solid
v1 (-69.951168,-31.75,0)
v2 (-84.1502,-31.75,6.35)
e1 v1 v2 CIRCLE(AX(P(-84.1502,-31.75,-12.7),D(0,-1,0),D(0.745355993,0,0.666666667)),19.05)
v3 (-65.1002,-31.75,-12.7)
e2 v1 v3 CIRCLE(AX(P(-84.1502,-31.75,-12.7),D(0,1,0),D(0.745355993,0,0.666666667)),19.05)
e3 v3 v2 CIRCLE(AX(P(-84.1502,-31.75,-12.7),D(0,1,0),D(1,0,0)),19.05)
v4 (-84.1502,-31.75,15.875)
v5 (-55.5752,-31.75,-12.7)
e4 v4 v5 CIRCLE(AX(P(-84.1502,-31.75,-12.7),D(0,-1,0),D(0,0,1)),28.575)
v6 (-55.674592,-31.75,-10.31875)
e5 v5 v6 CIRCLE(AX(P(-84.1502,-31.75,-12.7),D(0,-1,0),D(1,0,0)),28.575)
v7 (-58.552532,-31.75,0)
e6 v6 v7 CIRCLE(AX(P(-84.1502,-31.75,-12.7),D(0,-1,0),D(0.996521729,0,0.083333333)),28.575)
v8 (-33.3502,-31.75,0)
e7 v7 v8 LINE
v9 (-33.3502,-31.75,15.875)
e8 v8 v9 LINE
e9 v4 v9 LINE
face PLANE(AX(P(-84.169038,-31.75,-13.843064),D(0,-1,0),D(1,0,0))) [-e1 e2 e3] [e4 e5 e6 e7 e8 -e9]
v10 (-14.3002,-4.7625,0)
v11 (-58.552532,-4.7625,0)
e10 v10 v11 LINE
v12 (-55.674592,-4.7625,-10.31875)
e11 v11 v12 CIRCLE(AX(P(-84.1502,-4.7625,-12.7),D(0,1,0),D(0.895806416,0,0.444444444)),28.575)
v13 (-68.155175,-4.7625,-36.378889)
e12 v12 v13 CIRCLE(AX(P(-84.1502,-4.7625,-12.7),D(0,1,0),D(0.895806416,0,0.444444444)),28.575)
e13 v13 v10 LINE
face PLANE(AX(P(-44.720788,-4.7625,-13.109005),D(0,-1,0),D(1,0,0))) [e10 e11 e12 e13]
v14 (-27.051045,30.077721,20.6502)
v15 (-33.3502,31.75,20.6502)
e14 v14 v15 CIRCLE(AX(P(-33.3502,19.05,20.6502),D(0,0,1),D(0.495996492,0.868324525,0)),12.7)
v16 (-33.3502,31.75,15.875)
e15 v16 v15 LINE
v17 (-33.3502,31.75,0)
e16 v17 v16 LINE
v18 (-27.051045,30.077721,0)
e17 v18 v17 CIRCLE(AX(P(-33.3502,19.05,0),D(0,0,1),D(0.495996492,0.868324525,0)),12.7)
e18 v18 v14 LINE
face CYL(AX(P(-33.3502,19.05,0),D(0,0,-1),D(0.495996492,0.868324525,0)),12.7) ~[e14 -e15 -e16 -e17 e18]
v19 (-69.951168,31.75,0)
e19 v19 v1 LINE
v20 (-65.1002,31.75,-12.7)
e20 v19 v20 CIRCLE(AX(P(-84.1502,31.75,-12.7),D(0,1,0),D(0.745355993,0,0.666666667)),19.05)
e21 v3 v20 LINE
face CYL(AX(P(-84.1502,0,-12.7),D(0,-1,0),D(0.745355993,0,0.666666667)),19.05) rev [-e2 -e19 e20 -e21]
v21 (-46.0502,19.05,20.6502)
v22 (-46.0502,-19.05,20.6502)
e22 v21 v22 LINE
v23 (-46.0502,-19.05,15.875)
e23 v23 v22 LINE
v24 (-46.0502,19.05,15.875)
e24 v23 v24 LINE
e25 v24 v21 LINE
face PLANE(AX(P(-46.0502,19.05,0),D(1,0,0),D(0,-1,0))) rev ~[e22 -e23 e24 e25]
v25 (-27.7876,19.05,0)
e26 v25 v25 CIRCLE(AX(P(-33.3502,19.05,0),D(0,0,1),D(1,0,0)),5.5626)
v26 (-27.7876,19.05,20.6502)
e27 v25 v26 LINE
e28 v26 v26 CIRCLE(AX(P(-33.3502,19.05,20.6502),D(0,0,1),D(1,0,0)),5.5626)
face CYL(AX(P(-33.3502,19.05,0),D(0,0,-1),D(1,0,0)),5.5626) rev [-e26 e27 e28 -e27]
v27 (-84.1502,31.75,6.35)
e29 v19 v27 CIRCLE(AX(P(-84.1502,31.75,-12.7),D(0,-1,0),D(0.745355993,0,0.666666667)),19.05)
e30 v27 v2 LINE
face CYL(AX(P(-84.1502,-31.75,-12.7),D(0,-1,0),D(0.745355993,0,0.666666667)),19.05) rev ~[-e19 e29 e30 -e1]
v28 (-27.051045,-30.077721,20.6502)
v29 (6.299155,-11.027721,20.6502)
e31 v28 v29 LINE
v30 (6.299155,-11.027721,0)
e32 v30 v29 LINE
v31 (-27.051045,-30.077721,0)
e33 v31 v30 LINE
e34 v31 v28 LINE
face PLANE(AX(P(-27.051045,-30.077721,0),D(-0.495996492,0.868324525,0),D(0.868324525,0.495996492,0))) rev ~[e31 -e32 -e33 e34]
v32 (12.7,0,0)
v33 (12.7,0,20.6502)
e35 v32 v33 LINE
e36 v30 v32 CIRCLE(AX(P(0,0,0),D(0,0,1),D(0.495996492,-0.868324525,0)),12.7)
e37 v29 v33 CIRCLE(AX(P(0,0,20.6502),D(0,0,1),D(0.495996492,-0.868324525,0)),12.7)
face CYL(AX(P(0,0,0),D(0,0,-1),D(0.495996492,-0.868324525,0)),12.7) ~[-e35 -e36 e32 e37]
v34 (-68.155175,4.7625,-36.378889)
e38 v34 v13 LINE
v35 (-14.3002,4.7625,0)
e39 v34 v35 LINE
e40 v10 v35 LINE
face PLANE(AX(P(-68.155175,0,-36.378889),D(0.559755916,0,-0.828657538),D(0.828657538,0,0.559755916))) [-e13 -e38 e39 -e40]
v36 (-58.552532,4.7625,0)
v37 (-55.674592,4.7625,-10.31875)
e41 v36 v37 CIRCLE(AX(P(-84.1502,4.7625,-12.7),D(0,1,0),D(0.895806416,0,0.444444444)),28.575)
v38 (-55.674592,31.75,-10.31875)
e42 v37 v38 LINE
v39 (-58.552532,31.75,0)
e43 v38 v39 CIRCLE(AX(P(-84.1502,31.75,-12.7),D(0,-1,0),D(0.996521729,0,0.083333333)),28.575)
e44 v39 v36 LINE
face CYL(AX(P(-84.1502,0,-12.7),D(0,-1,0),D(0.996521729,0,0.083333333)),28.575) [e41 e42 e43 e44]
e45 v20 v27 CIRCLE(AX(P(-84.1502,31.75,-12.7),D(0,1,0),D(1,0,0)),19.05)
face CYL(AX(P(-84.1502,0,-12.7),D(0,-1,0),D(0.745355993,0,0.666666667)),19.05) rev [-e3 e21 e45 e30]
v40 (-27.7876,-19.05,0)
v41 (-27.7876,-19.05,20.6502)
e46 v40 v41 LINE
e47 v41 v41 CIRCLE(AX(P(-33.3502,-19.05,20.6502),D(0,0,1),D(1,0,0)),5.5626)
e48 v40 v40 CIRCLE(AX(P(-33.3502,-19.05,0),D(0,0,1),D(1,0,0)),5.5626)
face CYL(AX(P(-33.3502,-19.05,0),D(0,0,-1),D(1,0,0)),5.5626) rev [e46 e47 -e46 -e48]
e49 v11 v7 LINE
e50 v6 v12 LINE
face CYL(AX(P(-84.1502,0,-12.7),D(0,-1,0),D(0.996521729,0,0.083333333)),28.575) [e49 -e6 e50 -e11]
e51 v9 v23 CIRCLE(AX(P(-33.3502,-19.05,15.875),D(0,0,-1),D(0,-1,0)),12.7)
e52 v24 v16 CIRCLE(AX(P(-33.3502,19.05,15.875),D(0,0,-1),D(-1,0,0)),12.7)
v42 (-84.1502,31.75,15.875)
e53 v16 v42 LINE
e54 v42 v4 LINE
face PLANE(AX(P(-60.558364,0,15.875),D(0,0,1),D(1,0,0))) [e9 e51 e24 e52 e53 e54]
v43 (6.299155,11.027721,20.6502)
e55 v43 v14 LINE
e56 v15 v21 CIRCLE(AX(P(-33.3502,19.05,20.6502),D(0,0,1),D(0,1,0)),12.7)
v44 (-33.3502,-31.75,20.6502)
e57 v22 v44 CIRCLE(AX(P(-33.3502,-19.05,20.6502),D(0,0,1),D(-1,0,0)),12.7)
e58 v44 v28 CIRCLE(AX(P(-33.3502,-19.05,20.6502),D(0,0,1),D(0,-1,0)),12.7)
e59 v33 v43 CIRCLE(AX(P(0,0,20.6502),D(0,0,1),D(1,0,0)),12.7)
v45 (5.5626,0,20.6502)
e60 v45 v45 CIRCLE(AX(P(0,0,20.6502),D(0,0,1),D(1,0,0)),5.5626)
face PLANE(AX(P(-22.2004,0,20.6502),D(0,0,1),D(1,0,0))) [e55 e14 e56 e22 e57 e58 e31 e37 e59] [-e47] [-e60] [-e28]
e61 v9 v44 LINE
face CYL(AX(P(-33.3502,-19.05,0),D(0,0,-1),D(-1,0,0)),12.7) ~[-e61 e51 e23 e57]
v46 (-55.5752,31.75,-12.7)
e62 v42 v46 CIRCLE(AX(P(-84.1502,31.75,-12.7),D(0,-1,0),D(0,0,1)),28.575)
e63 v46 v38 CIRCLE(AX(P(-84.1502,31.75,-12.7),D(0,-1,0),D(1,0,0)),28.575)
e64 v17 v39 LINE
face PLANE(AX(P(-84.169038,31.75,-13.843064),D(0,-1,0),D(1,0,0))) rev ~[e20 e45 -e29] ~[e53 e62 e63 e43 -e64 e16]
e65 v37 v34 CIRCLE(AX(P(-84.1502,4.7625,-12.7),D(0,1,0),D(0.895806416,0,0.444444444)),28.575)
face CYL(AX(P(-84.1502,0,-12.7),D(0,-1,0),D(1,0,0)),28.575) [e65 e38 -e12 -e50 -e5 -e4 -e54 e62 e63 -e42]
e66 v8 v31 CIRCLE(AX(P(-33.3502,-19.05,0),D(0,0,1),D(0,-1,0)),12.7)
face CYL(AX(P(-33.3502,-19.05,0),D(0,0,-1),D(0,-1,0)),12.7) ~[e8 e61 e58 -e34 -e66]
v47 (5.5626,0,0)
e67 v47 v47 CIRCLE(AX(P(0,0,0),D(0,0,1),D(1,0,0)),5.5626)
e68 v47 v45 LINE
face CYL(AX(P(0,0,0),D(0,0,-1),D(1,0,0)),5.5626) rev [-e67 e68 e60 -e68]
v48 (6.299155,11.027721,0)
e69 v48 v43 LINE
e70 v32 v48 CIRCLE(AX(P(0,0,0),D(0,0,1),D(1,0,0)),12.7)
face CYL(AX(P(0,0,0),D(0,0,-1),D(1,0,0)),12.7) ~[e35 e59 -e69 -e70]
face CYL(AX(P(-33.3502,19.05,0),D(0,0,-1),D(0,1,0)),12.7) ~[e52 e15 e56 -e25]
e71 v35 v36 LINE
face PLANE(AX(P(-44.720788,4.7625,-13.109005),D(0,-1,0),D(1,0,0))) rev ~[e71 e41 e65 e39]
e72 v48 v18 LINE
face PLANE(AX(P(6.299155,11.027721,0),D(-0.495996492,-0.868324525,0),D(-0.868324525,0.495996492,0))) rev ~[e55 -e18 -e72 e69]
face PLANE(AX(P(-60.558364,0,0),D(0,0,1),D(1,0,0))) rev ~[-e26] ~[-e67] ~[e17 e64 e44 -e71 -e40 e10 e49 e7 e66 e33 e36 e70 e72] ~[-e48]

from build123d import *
from build123d import SkipClean  # not in build123d's __all__

# Parameters (mm, degrees)
F0_R     = 5.5626
F1_DEPTH = 20.6502
F2_DEPTH = 15.875
F4_DEPTH = 31.75
F6_DEPTH = 4.7625
F8_DEPTH = 381


with BuildPart() as f1:
    # F0 (on Top) → F1 (new body)
    with BuildSketch(Plane.XY):
        with BuildLine():
            ThreePointArc((6.2991554441, -11.0277214642), (-12.7, 0), (6.2991554441, 11.0277214642))
            Line((6.2991554441, 11.0277214642), (-27.0510445559, 30.0777214642))
            ThreePointArc((-27.0510445559, 30.0777214642), (-22.3663647377, 25.4253715915), (-20.6502, 19.05))
            ThreePointArc((-20.6502, 19.05), (-33.3502, 6.35), (-46.0502, 19.05))
            Line((-46.0502, 19.05), (-46.0502, -19.05))
            ThreePointArc((-46.0502, -19.05), (-33.3502, -6.35), (-20.6502, -19.05))
            ThreePointArc((-20.6502, -19.05), (-22.3663647377, -25.4253715915), (-27.0510445559, -30.0777214642))
            Line((-27.0510445559, -30.0777214642), (6.2991554441, -11.0277214642))
        make_face()
        with BuildLine():
            ThreePointArc((-20.6502, 19.05), (-22.3663647377, 25.4253715915), (-27.0510445559, 30.0777214642))
            ThreePointArc((-27.0510445559, 30.0777214642), (-30.0915240875, 31.3248128824), (-33.3502, 31.75))
            ThreePointArc((-33.3502, 31.75), (-42.3304561211, 28.0302561211), (-46.0502, 19.05))
            ThreePointArc((-46.0502, 19.05), (-33.3502, 6.35), (-20.6502, 19.05))
        make_face()
        with Locations((-33.3502, 19.05)):
            Circle(F0_R, mode=Mode.SUBTRACT)
        with BuildLine():
            ThreePointArc((6.2991554441, -11.0277214642), (10.9838352623, -6.3753715915), (12.7, 0))
            ThreePointArc((12.7, 0), (10.9838352623, 6.3753715915), (6.2991554441, 11.0277214642))
            ThreePointArc((6.2991554441, 11.0277214642), (-12.7, 0), (6.2991554441, -11.0277214642))
        make_face()
        Circle(F0_R, mode=Mode.SUBTRACT)
        with BuildLine():
            ThreePointArc((-33.3502, -31.75), (-30.0915240875, -31.3248128824), (-27.0510445559, -30.0777214642))
            ThreePointArc((-27.0510445559, -30.0777214642), (-22.3663647377, -25.4253715915), (-20.6502, -19.05))
            ThreePointArc((-20.6502, -19.05), (-33.3502, -6.35), (-46.0502, -19.05))
            ThreePointArc((-46.0502, -19.05), (-42.3304561211, -28.0302561211), (-33.3502, -31.75))
        make_face()
        with Locations((-33.3502, -19.05)):
            Circle(F0_R, mode=Mode.SUBTRACT)
    extrude(amount=F1_DEPTH)

    # F0 (on Top) → F2 (join)
    with BuildSketch(Plane.XY):
        with BuildLine():
            ThreePointArc((-46.0502, 19.05), (-42.3304561211, 28.0302561211), (-33.3502, 31.75))
            Line((-33.3502, 31.75), (-84.1502, 31.75))
            Line((-84.1502, 31.75), (-84.1502, -31.75))
            Line((-84.1502, -31.75), (-33.3502, -31.75))
            ThreePointArc((-33.3502, -31.75), (-42.3304561211, -28.0302561211), (-46.0502, -19.05))
            Line((-46.0502, -19.05), (-46.0502, 19.05))
        make_face()
    extrude(amount=F2_DEPTH)

    # F3 (on Front) → F4 (join, symmetric)
    with BuildSketch(Plane.XZ):
        with BuildLine():
            ThreePointArc((-55.6745916055, -10.31875), (-56.6256842933, -5.0233040887), (-58.5525316492, 0))
            Line((-58.5525316492, 0), (-69.9511683429, 0))
            ThreePointArc((-69.9511683429, 0), (-66.3542165618, -5.9025391898), (-65.1002, -12.7))
            ThreePointArc((-65.1002, -12.7), (-97.6205841816, -26.1703841816), (-84.1502, 6.35))
            Line((-84.1502, 6.35), (-84.1502, 15.875))
            ThreePointArc((-84.1502, 15.875), (-104.3557762724, -32.9055762724), (-55.5752, -12.7))
            ThreePointArc((-55.5752, -12.7), (-55.6000587142, -11.5083383184), (-55.6745916055, -10.31875))
        make_face()
    extrude(amount=F4_DEPTH, both=True)

    # F5 (on Front) → F6 (join, symmetric)
    with BuildSketch(Plane.XZ):
        with BuildLine():
            ThreePointArc((-58.5525316492, 0), (-56.5215204273, -19.9929205446), (-68.1551747025, -36.3788891364))
            Line((-68.1551747025, -36.3788891364), (-14.3002, 0))
            Line((-14.3002, 0), (-58.5525316492, 0))
        make_face()
    extrude(amount=F6_DEPTH, both=True)

    # F7 (on face) → F8 (cut, symmetric)
    with BuildSketch(Plane.XZ.offset(31.75)):
        with BuildLine():
            ThreePointArc((-69.9511683429, 0), (-76.3730700667, 4.6901912008), (-84.1502, 6.35))
            ThreePointArc((-84.1502, 6.35), (-97.6205841816, -26.1703841816), (-65.1002, -12.7))
            ThreePointArc((-65.1002, -12.7), (-66.3542165618, -5.9025391898), (-69.9511683429, 0))
        make_face()
    with SkipClean():  # cleaning this boolean's faces spoils the solid; the shape is the same uncleaned
        extrude(amount=F8_DEPTH, both=True, mode=Mode.SUBTRACT)


solid = f1.part
